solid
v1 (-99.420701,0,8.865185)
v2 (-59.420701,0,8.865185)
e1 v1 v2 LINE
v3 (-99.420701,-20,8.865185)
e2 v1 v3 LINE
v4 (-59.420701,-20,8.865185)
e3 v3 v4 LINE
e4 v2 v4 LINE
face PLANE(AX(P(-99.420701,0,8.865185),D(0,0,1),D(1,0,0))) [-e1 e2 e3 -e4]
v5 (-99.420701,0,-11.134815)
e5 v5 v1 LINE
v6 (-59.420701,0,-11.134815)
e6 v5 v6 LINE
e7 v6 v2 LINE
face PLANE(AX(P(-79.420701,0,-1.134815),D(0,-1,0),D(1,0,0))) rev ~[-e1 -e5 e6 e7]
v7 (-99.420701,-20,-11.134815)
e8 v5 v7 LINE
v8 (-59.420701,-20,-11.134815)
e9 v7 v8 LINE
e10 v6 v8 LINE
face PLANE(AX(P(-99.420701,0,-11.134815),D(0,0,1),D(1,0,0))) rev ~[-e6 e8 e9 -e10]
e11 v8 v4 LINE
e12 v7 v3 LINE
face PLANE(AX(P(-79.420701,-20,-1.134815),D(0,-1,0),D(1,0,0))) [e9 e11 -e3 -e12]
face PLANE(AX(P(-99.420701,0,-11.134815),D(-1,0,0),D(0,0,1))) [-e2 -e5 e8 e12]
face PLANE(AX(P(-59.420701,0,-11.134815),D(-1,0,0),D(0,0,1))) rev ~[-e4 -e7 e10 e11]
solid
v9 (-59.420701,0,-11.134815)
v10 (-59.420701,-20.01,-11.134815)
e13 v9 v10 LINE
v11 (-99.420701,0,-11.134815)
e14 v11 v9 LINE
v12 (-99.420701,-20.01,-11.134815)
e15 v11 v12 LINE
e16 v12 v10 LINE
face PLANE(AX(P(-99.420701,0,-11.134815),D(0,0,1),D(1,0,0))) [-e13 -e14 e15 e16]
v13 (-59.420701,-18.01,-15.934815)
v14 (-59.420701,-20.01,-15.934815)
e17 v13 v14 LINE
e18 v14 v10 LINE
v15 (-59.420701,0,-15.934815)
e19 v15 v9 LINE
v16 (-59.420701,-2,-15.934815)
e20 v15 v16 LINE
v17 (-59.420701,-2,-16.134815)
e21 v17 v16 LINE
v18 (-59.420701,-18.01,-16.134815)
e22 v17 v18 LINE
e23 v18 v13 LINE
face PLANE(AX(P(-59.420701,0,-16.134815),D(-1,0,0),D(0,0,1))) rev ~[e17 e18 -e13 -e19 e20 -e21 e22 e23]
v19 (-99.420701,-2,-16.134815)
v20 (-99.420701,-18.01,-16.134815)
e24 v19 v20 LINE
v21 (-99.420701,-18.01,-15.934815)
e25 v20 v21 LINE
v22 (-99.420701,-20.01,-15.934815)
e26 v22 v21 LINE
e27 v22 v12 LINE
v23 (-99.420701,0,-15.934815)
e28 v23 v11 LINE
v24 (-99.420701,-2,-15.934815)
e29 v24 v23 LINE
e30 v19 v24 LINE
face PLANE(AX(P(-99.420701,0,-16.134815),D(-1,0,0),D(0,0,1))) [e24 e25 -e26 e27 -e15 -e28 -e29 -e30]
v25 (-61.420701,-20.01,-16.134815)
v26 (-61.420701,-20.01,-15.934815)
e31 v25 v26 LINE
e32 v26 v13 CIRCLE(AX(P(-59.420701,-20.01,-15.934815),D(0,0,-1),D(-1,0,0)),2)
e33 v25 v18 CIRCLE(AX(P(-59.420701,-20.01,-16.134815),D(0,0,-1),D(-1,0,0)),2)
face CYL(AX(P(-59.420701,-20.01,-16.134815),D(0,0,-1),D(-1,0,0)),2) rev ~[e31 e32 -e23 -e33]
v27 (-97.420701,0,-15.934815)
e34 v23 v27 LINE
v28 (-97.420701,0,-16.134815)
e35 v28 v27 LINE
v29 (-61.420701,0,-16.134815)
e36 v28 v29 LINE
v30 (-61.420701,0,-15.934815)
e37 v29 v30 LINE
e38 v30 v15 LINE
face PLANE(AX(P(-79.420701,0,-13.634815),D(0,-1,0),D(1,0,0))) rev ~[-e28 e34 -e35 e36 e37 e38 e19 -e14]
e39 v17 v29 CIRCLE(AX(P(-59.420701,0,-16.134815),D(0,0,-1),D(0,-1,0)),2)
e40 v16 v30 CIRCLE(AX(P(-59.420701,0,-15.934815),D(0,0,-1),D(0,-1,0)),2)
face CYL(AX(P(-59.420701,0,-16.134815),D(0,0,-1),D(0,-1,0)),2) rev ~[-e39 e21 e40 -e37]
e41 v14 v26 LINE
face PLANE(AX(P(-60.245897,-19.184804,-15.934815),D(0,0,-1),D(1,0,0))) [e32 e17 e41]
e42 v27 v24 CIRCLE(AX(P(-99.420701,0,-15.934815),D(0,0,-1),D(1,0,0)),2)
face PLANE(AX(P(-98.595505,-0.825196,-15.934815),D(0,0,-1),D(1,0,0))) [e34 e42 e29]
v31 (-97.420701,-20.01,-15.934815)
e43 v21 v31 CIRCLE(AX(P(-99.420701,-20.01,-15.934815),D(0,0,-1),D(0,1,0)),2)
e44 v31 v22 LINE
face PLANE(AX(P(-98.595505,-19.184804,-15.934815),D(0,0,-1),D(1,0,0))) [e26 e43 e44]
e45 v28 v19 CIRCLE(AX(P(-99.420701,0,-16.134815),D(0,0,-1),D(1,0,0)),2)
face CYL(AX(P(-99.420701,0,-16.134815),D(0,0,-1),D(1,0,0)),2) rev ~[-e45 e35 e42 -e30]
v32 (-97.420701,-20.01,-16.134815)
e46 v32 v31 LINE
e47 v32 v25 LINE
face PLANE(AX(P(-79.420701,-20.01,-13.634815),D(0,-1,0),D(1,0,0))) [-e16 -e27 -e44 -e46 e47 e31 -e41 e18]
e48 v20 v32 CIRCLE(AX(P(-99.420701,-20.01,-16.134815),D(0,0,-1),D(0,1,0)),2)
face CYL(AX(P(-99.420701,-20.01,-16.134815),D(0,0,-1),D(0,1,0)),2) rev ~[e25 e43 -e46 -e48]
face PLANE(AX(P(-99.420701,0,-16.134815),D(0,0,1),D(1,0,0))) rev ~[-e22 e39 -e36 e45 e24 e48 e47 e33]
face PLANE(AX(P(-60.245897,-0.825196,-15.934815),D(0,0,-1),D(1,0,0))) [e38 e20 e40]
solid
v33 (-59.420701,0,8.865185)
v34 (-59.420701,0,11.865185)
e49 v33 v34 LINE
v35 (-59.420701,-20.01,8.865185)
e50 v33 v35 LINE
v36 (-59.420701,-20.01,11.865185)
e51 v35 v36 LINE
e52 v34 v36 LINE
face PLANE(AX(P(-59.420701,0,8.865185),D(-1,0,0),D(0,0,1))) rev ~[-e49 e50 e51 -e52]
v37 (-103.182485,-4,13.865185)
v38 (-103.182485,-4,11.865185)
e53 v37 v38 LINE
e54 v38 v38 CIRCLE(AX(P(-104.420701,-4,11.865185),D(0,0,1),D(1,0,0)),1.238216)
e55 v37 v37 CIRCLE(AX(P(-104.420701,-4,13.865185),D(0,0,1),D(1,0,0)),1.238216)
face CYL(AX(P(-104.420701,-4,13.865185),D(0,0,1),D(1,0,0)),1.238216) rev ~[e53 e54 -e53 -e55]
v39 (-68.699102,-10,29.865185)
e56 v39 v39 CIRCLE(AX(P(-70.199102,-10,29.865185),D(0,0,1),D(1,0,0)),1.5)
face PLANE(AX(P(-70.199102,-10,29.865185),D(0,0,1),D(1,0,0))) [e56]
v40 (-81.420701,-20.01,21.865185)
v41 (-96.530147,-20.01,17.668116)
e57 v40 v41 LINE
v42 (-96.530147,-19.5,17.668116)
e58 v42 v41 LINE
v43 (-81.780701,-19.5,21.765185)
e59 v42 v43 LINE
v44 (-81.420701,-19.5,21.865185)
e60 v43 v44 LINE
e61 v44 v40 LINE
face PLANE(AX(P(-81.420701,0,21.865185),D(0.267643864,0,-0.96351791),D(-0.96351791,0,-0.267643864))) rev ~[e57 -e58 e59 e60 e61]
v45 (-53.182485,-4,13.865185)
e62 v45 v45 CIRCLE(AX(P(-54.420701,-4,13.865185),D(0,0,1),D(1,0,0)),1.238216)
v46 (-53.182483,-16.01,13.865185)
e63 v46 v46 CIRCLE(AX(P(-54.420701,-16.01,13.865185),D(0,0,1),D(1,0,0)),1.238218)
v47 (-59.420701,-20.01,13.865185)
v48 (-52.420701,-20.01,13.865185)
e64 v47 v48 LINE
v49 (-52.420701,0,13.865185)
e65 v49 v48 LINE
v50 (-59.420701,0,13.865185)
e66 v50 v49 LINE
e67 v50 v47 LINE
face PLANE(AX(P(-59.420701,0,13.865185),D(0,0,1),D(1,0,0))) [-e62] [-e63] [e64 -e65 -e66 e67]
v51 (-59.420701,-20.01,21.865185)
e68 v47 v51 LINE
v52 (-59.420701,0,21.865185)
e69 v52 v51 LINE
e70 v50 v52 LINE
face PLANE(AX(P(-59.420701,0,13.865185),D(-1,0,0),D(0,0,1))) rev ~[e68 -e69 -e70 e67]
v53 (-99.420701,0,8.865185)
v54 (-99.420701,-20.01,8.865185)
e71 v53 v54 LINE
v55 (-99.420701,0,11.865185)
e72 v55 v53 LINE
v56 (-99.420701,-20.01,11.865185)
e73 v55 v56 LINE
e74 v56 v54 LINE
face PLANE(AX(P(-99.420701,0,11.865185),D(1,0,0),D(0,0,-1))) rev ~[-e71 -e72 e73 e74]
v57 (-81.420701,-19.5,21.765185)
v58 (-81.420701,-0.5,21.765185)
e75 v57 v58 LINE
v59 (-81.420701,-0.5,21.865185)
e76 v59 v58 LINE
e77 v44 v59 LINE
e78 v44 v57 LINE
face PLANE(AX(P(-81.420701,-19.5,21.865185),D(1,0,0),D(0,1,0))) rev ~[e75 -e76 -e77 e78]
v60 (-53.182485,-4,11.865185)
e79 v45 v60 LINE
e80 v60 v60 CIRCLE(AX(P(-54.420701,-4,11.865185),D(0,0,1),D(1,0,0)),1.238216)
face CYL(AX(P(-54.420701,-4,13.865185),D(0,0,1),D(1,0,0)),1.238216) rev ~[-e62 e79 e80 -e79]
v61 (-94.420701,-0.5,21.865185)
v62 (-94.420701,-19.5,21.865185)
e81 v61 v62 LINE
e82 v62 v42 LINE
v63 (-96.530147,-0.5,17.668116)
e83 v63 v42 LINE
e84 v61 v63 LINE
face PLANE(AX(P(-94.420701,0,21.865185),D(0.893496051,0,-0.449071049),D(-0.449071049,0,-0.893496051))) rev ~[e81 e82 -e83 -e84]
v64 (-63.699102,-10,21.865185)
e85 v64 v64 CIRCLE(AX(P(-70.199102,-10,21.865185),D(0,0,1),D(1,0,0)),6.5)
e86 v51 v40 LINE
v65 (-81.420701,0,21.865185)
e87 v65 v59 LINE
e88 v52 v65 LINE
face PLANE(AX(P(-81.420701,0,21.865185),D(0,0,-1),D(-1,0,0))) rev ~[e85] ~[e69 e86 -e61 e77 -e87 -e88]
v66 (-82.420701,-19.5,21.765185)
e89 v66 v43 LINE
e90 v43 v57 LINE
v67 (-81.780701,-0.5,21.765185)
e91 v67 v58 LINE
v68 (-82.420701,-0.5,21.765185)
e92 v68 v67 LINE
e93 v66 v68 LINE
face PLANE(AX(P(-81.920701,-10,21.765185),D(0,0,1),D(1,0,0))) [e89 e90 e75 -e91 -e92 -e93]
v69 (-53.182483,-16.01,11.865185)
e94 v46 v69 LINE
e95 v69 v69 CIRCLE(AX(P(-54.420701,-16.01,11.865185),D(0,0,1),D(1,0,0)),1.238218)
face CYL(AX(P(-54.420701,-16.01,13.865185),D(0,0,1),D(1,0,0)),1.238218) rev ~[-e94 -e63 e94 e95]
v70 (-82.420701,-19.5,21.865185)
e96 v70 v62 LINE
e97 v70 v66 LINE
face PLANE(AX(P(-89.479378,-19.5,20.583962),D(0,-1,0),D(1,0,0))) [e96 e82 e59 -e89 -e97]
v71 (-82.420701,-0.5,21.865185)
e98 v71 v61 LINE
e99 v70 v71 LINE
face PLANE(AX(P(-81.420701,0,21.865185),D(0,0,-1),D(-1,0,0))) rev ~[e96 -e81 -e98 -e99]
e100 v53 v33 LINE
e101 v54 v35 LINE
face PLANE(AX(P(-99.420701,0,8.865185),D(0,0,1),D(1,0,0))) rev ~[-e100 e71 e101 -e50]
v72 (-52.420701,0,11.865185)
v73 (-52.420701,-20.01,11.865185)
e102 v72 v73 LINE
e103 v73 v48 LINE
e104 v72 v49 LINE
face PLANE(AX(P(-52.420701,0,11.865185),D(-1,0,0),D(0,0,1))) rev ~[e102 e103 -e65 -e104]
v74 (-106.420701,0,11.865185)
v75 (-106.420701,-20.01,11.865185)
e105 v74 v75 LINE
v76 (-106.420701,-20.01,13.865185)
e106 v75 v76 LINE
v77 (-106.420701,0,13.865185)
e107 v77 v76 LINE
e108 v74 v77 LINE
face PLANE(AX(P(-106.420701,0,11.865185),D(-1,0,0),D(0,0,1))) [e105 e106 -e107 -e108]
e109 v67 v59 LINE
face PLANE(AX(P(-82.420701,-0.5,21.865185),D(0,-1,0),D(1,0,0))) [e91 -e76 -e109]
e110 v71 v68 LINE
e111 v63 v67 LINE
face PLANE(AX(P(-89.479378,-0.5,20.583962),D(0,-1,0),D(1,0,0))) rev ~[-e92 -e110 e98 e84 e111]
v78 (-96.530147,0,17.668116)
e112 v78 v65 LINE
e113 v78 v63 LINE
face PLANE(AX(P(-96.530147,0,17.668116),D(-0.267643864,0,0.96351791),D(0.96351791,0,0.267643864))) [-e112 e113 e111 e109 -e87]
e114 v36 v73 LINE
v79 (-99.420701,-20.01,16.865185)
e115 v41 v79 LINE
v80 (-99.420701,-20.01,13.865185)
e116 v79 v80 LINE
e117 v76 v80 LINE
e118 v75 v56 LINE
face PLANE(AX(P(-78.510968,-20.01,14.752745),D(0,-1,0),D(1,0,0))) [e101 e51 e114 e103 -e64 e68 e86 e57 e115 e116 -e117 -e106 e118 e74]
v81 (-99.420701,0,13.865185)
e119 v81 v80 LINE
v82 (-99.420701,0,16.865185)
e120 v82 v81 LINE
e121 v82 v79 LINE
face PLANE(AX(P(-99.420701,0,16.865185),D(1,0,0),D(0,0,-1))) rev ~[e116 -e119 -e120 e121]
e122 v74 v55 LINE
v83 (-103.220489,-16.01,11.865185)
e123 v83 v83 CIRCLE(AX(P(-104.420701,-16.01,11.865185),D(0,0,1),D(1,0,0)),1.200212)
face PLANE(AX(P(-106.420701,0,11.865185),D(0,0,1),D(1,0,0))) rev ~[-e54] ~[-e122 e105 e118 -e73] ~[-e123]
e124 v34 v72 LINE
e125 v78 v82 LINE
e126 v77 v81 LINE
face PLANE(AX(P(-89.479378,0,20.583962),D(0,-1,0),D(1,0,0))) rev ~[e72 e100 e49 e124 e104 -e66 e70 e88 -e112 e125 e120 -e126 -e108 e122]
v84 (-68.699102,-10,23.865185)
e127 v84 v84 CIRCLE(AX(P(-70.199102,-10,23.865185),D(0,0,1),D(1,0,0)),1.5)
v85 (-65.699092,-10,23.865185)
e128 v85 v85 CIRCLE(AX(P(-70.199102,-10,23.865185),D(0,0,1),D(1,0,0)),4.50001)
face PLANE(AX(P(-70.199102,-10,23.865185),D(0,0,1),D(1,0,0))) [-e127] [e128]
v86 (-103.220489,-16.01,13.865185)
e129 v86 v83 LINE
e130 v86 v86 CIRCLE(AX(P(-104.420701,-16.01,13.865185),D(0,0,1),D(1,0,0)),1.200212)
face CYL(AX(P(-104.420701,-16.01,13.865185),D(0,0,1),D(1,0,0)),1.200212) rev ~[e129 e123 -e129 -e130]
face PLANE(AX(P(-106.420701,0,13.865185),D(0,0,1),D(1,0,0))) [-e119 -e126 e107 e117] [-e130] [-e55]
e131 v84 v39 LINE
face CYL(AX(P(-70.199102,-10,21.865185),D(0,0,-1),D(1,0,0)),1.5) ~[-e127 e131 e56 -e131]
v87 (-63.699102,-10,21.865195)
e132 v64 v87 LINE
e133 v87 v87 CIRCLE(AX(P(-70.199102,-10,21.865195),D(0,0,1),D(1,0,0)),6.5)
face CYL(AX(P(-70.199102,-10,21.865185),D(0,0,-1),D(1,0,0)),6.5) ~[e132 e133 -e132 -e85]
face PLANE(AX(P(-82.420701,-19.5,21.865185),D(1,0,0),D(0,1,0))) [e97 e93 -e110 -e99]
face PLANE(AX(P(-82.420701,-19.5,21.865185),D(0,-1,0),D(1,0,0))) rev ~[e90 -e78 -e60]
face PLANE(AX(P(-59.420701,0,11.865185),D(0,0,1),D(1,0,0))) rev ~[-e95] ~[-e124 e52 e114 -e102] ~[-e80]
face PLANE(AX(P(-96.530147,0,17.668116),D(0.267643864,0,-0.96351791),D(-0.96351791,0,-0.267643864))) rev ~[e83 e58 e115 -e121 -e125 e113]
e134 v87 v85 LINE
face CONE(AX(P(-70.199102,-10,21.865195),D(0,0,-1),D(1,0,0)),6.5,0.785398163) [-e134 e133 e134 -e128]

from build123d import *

# Parameters (mm, degrees)
F0_W      = 7
F0_H      = 2
F1_DEPTH  = 20.01
F0_W_2    = 40
F0_H_2    = 5
F0_H_3    = 20
F2_DEPTH  = 20
F3_R      = 1.2382162301
F3_R_2    = 1.2382178276
F3_R_3    = 1.2002117001
F3_R_4    = 1.2382157204
F4_DEPTH  = 5
F5_DEPTH  = 19.5
F6_DEPTH  = 0.5
F7_W      = 1
F7_H      = 19
F8_DEPTH  = 0.1
F7_R      = 1.5
F9_DEPTH  = 8
F7_R_2    = 6.5
F10_DEPTH = 2
F11_SIZE  = 1.99999
F13_DEPTH = 0.2


# Not quite as in the source:
# - a fillet or chamfer is up to 0.001 mm smaller than in the source, because OpenCascade refuses the exact size


with BuildPart() as f1:
    # F0 (on Front) → F1 (new body)
    with BuildSketch(Plane.XZ):
        Polygon((-99.4207011163, 11.8651846424), (-99.4207011163, 8.8651846424), (-59.4207011163, 8.8651846424), (-59.4207011163, 11.8651846424), (-59.4207011163, 13.8651846424), (-59.4207011163, 21.8651846424), (-81.4207011163, 21.8651846424), (-96.5301473874, 17.6681162337), (-99.4207011163, 16.8651846424), (-99.4207011163, 13.8651846424), align=None)
        with Locations((-102.9207011163, 12.8651846424)):
            Rectangle(F0_W, F0_H)
        with Locations((-55.9207011163, 12.8651846424)):
            Rectangle(F0_W, F0_H)
    extrude(amount=F1_DEPTH)

    # F3 (on face) → F4 (cut)
    with BuildSketch(Plane.XY.offset(13.8651846424)):
        with Locations((-54.4207011163, -4)):
            Circle(F3_R)
        with Locations((-54.4207011163, -16.01)):
            Circle(F3_R_2)
        with Locations((-104.4207011163, -16.01)):
            Circle(F3_R_3)
        with Locations((-104.4207011163, -4)):
            Circle(F3_R_4)
    extrude(amount=-F4_DEPTH, mode=Mode.SUBTRACT)

    # F0 (on Front) → F5 (join)
    with BuildSketch(Plane.XZ):
        Polygon((-94.4207011163, 21.8651846424), (-96.5301473874, 17.6681162337), (-81.4207011163, 21.8651846424), align=None)
    extrude(amount=F5_DEPTH)

    # F0 (on Front) → F6 (cut)
    with BuildSketch(Plane.XZ):
        Polygon((-94.4207011163, 21.8651846424), (-96.5301473874, 17.6681162337), (-81.4207011163, 21.8651846424), align=None)
    extrude(amount=F6_DEPTH, mode=Mode.SUBTRACT)

    # F7 (on face) → F8 (cut)
    with BuildSketch(Plane.XY.offset(21.8651846424)):
        with Locations((-81.9207011163, -10)):
            Rectangle(F7_W, F7_H)
    extrude(amount=-F8_DEPTH, mode=Mode.SUBTRACT)

    # F7 (on face) → F9 (join)
    with BuildSketch(Plane.XY.offset(21.8651846424)):
        with Locations((-70.1991021633, -10)):
            Circle(F7_R)
    extrude(amount=F9_DEPTH)

    # F7 (on face) → F10 (join)
    with BuildSketch(Plane.XY.offset(21.8651846424)):
        with Locations((-70.1991021633, -10)):
            Circle(F7_R_2)
        with Locations((-70.1991021633, -10)):
            Circle(F7_R, mode=Mode.SUBTRACT)
    extrude(amount=F10_DEPTH)

    # F11 (size 2 in the source; OpenCascade refuses exactly that, so slightly less here)
    f11_edges = [f1.edges().sort_by_distance(p)[0] for p in [
        (-76.699102, -10, 23.865185),
    ]]
    chamfer(f11_edges, length=F11_SIZE)


with BuildPart() as f1b:
    # F0 (on Front) → F1, piece 2 (new body)
    with BuildSketch(Plane.XZ):
        with Locations((-79.4207011163, -13.6348153576)):
            Rectangle(F0_W_2, F0_H_2)
    extrude(amount=F1_DEPTH)

    # F12 (on face) → F13 (cut)
    with BuildSketch(Plane(origin=(0, 0, -16.1348153576), x_dir=(1, 0, 0), z_dir=(0, 0, -1))):
        with BuildLine():
            Line((-59.4207011163, 0), (-59.4207011163, 2))
            ThreePointArc((-59.4207011163, 2), (-60.8349146787, 1.4142135624), (-61.4207011163, 0))
            Line((-61.4207011163, 0), (-59.4207011163, 0))
        make_face()
        with BuildLine():
            ThreePointArc((-61.4207011163, 20.01), (-60.8349146787, 18.5957864376), (-59.4207011163, 18.01))
            Line((-59.4207011163, 18.01), (-59.4207011163, 20.01))
            Line((-59.4207011163, 20.01), (-61.4207011163, 20.01))
        make_face()
        with BuildLine():
            ThreePointArc((-99.4207011163, 18.01), (-98.006487554, 18.5957864376), (-97.4207011163, 20.01))
            Line((-97.4207011163, 20.01), (-99.4207011163, 20.01))
            Line((-99.4207011163, 20.01), (-99.4207011163, 18.01))
        make_face()
        with BuildLine():
            Line((-99.4207011163, 0), (-97.4207011163, 0))
            ThreePointArc((-97.4207011163, 0), (-98.006487554, 1.4142135624), (-99.4207011163, 2))
            Line((-99.4207011163, 2), (-99.4207011163, 0))
        make_face()
    extrude(amount=-F13_DEPTH, mode=Mode.SUBTRACT)


with BuildPart() as f2:
    # F0 (on Front) → F2 (new body)
    with BuildSketch(Plane.XZ):
        with Locations((-79.4207011163, -1.1348153576)):
            Rectangle(F0_W_2, F0_H_3)
    extrude(amount=F2_DEPTH)


solid = Compound([f1.part, f1b.part, f2.part])
